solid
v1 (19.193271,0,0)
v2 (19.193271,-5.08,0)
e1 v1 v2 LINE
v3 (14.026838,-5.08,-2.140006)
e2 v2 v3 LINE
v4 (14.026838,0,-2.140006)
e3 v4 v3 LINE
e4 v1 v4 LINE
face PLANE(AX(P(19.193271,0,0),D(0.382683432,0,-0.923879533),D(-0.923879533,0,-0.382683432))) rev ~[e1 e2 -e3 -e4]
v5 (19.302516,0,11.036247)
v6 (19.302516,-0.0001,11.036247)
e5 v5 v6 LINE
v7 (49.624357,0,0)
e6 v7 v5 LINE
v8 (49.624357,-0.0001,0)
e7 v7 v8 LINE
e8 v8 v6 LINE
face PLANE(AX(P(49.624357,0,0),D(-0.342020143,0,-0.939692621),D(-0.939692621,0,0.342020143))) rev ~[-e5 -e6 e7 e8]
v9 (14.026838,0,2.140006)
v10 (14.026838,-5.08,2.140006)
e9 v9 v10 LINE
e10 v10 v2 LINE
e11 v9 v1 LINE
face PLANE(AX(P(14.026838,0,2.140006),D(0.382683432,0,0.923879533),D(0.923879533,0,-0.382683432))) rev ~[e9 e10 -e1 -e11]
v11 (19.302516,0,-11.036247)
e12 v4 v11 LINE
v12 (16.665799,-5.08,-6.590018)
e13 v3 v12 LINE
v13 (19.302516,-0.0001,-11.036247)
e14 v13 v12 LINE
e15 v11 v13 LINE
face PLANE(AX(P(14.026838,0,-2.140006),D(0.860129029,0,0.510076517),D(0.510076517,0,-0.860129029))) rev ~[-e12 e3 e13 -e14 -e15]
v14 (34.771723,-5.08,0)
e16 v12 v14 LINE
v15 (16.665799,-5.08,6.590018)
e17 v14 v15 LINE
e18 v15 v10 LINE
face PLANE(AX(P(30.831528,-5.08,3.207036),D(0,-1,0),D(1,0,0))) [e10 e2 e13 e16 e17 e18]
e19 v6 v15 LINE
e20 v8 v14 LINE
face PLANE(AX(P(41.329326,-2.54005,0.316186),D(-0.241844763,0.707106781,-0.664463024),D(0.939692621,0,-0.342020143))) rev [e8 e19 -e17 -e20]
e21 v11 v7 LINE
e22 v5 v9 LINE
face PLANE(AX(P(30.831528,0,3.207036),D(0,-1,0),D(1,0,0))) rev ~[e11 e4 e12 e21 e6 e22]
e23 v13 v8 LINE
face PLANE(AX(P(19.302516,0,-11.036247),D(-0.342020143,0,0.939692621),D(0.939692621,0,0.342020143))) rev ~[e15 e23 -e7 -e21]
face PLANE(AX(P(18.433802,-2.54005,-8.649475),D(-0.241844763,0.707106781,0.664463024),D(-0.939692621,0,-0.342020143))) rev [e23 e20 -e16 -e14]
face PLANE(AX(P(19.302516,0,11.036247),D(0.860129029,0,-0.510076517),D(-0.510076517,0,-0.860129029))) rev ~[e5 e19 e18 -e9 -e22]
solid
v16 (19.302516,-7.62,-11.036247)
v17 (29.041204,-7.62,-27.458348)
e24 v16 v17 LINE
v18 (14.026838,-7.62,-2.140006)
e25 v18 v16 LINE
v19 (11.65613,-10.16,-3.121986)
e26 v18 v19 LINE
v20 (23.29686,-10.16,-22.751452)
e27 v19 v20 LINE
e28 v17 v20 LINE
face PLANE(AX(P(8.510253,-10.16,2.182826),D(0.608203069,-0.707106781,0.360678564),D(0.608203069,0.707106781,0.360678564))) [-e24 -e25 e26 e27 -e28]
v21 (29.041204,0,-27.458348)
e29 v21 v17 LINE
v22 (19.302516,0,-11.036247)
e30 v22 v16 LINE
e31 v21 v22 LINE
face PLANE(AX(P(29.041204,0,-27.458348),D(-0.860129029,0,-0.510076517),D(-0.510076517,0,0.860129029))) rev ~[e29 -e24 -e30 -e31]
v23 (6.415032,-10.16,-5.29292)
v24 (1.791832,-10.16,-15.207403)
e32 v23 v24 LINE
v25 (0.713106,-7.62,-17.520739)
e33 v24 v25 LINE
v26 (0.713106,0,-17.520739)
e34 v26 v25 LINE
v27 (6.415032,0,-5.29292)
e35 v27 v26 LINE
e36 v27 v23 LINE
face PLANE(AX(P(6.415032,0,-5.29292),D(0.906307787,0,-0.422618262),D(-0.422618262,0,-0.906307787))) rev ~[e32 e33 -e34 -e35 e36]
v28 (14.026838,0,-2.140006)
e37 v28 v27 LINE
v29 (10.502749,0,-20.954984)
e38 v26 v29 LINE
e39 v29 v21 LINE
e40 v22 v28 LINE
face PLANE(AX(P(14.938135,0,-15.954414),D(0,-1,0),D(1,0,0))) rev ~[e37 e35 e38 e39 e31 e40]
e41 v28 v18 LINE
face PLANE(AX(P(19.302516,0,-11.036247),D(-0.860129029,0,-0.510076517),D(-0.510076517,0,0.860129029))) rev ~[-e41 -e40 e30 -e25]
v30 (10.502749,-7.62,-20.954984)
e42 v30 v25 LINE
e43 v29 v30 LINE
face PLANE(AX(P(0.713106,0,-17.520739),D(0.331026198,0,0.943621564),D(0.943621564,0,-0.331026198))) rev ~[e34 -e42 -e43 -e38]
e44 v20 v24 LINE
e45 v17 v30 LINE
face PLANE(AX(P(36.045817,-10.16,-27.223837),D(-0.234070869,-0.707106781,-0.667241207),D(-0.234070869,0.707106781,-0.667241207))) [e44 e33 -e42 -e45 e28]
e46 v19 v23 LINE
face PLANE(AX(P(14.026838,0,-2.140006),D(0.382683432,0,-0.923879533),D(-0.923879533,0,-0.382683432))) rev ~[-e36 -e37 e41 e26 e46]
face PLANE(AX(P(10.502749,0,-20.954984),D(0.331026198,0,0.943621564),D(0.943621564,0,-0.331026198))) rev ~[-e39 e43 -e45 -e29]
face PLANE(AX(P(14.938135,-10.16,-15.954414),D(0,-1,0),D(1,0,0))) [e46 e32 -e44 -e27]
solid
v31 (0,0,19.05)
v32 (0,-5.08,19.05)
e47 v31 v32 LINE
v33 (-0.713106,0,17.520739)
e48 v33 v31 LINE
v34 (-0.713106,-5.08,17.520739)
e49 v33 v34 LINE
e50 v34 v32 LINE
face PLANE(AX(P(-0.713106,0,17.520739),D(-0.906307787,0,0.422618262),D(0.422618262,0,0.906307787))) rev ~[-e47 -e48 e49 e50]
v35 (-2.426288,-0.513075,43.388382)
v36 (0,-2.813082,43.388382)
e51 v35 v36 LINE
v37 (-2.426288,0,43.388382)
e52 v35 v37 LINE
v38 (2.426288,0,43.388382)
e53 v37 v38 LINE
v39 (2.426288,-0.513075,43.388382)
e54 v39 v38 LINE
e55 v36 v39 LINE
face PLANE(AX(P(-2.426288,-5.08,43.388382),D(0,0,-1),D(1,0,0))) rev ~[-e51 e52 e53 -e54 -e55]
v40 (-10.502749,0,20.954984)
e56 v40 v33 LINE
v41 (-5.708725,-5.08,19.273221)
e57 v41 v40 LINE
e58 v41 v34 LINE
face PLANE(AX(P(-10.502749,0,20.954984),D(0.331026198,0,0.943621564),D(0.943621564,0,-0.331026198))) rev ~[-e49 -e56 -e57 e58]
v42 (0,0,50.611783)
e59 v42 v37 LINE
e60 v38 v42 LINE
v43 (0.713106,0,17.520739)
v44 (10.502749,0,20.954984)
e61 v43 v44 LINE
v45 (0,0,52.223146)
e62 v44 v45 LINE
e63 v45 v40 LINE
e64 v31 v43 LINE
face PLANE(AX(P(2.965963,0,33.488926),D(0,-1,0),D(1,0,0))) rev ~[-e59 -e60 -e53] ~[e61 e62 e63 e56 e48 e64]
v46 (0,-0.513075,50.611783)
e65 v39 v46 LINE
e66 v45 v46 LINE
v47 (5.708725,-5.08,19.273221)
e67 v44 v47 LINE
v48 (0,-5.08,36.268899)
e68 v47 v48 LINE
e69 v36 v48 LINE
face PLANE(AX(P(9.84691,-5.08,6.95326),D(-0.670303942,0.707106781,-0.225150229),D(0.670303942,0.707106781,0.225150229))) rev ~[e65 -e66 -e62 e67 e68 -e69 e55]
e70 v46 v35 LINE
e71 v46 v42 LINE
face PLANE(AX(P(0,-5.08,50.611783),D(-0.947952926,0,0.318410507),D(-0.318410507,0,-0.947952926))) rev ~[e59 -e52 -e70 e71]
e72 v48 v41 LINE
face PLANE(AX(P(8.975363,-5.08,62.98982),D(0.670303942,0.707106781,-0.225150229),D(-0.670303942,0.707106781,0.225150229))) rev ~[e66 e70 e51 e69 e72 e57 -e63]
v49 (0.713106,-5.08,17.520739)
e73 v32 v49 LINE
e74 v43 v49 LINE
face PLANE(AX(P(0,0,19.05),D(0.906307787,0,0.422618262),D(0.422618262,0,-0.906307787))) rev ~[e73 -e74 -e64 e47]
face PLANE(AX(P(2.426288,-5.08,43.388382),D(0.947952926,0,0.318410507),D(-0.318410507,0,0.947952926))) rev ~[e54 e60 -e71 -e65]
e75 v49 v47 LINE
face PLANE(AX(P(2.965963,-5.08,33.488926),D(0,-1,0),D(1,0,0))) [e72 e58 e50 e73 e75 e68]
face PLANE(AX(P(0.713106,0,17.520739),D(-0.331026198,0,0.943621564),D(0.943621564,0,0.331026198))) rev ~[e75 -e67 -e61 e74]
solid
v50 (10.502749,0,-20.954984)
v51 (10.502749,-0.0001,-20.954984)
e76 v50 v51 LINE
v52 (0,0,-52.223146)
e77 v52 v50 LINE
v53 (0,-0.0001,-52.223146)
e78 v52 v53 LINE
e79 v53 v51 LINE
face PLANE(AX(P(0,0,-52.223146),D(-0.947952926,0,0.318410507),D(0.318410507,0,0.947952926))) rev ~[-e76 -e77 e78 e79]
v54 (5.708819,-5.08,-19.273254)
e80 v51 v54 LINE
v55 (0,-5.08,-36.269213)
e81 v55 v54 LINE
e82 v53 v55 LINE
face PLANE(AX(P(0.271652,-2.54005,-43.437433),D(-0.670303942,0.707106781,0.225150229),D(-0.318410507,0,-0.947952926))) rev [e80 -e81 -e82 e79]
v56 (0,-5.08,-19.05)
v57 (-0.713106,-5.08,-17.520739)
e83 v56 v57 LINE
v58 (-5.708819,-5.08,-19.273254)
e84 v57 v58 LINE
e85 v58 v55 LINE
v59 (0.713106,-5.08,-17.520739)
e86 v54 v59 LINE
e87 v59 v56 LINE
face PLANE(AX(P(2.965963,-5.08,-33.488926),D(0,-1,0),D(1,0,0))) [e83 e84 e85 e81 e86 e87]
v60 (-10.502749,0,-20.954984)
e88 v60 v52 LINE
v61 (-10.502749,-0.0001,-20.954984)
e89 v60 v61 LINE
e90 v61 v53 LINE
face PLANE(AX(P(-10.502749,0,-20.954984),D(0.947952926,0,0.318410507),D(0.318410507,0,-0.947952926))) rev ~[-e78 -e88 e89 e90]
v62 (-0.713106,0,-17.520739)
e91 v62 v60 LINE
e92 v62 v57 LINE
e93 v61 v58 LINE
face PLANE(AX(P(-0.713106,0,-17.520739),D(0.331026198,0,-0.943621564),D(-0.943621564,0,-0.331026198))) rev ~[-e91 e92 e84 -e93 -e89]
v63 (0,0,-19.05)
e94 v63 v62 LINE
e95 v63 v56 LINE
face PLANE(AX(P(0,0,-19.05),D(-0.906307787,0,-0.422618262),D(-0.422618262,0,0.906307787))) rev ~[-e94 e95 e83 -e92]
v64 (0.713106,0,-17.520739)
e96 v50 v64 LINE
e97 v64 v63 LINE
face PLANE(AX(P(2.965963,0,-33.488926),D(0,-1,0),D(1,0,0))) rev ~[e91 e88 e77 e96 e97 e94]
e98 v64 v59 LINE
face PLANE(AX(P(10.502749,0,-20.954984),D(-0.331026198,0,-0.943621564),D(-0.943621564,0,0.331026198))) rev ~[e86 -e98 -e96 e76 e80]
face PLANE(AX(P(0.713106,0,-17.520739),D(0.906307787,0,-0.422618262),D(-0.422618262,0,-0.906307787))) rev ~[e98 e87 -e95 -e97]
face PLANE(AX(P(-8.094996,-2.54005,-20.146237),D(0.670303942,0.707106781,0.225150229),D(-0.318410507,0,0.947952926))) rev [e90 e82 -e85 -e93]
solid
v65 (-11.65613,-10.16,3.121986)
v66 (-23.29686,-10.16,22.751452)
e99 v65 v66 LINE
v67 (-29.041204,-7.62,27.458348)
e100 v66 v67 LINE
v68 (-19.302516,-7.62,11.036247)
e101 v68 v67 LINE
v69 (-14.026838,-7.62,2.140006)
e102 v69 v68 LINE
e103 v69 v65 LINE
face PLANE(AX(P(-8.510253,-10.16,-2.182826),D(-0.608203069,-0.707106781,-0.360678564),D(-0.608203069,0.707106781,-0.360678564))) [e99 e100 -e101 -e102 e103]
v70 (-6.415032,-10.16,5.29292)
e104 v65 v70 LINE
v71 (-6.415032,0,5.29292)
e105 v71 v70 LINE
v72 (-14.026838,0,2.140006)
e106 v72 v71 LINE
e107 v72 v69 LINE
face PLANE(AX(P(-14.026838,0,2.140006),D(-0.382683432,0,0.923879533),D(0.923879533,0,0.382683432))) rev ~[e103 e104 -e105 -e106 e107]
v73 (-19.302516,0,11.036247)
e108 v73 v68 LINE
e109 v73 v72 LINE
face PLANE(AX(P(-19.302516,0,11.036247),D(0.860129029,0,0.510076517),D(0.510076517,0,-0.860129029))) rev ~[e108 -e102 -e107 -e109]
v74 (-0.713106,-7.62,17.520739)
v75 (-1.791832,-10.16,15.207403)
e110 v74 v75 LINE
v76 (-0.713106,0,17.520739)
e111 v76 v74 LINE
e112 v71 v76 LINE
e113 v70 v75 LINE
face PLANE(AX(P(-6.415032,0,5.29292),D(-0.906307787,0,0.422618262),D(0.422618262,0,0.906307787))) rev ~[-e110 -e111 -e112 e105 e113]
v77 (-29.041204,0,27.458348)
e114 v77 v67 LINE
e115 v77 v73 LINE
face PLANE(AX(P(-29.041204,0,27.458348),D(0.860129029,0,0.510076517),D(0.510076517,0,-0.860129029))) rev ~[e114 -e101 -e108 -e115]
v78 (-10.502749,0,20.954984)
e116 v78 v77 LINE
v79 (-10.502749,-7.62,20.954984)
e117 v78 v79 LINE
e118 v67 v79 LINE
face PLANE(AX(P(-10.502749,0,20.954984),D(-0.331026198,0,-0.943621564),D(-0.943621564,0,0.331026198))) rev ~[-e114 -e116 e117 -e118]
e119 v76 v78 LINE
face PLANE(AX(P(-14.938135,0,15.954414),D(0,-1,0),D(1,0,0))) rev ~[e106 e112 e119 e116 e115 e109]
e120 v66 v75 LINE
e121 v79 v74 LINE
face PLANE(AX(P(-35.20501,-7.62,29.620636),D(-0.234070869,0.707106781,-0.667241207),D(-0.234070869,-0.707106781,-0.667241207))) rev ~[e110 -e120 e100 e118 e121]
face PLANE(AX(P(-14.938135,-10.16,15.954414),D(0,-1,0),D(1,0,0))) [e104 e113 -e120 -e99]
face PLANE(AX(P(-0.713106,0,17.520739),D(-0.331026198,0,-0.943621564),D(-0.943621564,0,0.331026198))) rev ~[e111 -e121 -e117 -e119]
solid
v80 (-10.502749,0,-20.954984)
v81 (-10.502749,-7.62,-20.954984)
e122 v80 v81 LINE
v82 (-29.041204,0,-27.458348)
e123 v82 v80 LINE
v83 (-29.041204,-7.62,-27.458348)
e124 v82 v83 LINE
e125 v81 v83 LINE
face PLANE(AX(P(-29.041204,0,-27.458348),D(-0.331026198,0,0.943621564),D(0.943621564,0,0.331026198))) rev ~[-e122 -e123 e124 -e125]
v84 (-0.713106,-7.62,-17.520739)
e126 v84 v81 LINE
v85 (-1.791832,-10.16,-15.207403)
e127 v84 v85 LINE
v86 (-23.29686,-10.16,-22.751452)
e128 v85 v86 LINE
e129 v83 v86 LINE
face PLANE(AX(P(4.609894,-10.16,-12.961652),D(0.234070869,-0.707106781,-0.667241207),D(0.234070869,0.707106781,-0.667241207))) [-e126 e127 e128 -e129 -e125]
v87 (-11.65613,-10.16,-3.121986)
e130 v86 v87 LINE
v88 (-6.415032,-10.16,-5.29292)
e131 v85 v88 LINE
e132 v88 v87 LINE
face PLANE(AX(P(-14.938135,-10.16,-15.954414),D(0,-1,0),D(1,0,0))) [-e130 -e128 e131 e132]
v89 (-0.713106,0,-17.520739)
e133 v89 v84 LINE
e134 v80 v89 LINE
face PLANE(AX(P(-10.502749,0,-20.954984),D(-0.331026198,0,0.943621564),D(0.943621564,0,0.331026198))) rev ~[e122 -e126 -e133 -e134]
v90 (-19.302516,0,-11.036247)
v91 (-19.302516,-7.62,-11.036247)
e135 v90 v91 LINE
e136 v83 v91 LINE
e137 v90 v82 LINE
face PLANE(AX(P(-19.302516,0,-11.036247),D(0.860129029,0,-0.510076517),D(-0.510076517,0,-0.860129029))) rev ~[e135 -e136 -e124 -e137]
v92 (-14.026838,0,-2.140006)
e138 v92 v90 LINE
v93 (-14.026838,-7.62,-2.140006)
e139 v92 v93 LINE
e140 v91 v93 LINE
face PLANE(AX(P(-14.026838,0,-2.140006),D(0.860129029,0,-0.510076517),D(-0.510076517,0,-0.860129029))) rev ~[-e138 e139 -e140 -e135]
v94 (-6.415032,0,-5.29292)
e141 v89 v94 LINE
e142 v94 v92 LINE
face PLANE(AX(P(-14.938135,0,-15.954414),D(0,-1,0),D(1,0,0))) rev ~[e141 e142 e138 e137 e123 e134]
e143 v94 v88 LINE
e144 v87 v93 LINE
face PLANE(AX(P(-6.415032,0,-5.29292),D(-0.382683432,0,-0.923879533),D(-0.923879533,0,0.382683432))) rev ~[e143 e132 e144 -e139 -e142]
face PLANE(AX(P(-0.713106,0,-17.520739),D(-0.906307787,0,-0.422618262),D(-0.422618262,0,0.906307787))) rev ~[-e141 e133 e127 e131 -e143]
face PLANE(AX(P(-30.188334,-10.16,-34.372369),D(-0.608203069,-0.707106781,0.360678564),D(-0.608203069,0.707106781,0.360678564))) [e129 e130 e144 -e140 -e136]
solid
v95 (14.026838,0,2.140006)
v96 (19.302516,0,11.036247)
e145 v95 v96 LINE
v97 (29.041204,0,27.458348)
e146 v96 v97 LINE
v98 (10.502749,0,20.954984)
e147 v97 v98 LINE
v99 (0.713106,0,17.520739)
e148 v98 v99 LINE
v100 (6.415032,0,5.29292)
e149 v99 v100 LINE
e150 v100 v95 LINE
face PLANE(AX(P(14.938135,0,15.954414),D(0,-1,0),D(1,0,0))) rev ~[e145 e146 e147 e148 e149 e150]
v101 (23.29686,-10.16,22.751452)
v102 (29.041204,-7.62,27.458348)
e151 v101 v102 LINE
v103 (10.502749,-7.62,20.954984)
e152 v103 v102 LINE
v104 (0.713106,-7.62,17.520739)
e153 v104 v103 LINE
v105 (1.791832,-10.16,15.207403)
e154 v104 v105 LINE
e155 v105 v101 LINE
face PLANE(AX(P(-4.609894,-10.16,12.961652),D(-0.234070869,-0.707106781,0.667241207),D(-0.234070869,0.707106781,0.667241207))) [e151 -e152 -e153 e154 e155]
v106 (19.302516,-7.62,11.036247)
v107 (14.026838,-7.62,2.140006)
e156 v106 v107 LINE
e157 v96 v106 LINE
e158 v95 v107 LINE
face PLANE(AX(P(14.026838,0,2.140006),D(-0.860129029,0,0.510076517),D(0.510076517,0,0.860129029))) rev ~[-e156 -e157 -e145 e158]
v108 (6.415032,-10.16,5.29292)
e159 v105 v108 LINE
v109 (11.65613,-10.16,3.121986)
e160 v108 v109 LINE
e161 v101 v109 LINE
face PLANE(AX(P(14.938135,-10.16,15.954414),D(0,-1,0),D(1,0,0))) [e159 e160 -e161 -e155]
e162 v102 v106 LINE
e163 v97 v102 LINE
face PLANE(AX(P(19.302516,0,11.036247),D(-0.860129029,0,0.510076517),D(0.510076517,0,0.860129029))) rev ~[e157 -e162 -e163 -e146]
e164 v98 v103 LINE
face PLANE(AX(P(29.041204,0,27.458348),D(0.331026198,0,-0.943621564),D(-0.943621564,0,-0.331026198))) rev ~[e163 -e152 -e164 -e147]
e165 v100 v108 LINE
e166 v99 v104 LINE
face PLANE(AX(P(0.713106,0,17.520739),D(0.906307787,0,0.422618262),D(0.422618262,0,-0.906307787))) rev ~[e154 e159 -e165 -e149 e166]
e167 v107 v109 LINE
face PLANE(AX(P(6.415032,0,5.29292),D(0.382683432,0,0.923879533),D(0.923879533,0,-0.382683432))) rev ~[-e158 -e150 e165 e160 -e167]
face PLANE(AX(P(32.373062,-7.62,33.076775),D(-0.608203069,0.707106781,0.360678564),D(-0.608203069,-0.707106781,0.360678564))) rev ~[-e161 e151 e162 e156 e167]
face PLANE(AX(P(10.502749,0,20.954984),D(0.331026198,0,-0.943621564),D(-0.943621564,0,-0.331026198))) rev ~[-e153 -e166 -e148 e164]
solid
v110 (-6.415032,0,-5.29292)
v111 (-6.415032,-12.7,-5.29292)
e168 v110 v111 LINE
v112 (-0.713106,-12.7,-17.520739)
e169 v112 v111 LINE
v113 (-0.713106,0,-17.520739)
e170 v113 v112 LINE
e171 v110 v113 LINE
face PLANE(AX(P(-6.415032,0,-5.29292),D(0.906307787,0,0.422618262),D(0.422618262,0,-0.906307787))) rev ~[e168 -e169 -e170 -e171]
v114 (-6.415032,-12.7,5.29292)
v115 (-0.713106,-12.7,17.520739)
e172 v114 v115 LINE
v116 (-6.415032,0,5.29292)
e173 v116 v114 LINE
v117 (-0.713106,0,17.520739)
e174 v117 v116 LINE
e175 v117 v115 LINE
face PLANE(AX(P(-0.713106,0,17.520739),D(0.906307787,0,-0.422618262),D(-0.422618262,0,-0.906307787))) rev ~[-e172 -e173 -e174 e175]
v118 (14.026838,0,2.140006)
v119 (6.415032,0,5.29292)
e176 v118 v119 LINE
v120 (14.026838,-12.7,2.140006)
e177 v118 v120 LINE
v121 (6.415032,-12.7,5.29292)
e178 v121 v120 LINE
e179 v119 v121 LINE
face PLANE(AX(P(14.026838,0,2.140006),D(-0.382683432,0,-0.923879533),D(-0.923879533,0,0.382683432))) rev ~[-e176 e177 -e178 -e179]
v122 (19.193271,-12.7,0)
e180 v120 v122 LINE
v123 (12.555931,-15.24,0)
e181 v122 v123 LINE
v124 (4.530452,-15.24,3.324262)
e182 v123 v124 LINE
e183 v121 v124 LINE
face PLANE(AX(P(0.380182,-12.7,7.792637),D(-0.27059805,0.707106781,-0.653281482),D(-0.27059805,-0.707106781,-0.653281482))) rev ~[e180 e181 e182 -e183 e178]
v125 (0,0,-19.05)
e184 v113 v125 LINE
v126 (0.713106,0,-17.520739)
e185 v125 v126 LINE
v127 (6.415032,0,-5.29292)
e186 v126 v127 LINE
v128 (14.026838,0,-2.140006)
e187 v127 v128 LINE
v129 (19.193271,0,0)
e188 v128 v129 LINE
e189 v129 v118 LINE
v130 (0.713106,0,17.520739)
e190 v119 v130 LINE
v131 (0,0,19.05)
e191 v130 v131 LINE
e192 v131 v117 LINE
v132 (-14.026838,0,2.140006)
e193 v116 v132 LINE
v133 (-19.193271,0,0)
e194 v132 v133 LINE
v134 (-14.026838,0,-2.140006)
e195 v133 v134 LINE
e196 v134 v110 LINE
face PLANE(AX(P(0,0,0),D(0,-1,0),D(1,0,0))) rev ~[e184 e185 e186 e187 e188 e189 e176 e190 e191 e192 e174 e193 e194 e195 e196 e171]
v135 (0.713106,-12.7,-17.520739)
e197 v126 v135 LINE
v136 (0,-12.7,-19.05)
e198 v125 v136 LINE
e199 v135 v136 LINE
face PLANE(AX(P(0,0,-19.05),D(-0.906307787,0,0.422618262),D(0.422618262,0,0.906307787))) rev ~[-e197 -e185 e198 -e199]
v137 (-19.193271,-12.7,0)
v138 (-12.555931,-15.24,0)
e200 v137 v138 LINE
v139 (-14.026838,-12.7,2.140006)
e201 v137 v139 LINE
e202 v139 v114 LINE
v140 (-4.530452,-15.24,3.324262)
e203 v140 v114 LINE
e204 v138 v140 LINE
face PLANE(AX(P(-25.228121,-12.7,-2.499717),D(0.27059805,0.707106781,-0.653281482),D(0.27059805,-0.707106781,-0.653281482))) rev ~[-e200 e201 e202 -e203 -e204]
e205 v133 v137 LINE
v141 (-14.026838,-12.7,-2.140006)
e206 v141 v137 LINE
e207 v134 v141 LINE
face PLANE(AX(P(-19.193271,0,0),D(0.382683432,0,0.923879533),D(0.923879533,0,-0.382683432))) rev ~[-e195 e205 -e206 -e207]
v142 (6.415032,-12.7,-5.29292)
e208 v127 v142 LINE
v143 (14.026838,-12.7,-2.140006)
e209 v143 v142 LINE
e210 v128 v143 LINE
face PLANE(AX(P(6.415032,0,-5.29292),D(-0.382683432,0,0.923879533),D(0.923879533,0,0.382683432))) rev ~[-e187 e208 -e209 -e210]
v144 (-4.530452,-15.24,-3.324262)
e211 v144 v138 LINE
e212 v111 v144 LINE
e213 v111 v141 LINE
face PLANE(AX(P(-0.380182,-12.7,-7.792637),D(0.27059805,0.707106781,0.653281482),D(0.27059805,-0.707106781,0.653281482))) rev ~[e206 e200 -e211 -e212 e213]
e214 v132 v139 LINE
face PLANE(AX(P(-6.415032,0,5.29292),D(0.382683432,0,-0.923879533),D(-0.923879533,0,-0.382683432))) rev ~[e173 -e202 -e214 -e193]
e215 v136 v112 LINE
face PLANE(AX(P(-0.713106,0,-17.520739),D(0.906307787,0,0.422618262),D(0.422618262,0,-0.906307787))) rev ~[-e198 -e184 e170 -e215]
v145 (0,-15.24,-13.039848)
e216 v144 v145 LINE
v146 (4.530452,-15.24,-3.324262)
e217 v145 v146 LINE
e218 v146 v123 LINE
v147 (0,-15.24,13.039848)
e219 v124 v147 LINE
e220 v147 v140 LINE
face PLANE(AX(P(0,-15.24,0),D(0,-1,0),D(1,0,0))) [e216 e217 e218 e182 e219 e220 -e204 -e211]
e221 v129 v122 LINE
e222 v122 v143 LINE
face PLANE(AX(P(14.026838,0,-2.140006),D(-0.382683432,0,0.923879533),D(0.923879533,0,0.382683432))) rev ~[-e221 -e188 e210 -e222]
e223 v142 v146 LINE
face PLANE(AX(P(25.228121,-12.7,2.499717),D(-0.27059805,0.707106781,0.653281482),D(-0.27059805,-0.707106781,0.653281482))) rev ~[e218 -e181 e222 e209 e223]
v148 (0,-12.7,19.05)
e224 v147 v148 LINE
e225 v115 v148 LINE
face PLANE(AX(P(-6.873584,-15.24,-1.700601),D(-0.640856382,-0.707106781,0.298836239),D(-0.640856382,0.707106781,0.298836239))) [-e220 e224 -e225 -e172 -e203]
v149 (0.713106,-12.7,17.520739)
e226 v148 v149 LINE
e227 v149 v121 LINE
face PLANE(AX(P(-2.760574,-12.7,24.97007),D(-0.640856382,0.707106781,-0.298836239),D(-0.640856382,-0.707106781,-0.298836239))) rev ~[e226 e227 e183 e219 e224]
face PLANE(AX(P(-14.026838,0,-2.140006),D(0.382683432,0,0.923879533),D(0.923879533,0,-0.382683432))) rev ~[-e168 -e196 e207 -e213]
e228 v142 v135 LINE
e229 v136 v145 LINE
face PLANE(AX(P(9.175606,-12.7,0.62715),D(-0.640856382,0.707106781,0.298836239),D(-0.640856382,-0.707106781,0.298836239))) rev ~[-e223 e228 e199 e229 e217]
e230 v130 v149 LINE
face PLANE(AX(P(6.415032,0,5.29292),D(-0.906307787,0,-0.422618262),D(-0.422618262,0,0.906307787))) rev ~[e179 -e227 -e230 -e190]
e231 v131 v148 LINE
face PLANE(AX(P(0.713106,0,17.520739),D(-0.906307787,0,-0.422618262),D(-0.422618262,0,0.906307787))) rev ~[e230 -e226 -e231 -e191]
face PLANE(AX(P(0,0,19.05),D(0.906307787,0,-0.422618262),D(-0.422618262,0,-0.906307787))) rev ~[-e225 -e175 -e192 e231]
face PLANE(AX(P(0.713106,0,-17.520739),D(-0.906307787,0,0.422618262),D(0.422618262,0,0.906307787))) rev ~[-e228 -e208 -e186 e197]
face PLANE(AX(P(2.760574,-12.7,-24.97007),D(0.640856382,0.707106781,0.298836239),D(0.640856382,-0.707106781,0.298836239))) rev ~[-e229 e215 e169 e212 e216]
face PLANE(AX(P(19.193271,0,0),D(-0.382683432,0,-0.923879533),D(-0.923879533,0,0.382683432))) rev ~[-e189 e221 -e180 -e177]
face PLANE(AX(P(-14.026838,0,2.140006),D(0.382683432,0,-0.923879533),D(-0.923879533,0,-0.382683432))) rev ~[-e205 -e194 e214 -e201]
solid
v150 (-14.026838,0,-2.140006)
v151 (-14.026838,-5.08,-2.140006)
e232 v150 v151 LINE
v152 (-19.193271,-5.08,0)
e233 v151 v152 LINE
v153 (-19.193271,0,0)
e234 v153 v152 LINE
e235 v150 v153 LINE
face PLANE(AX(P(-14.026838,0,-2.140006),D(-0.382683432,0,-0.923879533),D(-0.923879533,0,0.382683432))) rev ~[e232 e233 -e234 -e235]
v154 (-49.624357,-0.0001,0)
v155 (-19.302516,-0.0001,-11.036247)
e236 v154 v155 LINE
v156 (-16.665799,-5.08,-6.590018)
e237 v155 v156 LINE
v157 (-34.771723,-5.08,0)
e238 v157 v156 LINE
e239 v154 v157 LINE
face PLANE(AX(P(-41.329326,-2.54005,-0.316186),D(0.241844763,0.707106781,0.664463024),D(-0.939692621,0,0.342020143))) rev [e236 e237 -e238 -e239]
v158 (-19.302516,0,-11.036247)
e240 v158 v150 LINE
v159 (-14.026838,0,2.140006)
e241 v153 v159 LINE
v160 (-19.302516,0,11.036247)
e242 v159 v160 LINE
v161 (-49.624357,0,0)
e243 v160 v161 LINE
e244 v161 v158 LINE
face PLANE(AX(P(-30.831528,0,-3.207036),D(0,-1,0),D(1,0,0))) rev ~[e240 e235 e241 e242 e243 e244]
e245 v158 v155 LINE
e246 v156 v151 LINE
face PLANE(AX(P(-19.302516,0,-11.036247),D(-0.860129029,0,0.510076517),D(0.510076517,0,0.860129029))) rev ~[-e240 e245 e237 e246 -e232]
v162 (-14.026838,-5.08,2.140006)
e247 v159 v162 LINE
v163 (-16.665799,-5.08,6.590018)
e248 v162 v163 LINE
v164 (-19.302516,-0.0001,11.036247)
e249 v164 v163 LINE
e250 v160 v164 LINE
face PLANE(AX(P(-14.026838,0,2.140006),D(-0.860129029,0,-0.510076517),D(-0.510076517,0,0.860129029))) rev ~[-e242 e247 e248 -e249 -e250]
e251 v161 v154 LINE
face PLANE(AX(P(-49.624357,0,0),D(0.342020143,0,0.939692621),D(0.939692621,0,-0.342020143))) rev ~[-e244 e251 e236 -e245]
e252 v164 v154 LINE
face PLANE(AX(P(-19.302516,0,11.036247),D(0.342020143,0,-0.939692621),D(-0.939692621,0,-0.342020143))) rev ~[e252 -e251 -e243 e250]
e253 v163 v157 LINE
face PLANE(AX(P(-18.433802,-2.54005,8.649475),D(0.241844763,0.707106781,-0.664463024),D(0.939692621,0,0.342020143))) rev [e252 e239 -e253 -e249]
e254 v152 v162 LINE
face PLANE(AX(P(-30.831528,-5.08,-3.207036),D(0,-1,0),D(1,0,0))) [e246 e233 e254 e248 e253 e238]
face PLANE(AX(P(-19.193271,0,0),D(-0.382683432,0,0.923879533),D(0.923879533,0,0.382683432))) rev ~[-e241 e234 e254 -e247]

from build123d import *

# Parameters (mm, degrees)
F1_DEPTH       = 5.08
F2_DEPTH       = 10.16
F3_DEPTH       = 15.24
F5_DEPTH       = 25.4
F6_T1_DEPTH    = 43.0847621983
F6_T3_DEPTH    = 42.4996652057
F6_2_T1_DEPTH  = 42.4996652057
F6_2_T3_DEPTH  = 43.0847621983
F6_3_T1_DEPTH  = 43.0847621983
F6_3_T3_DEPTH  = 42.4996652057
F6_4_T1_DEPTH  = 42.4996652057
F6_4_T3_DEPTH  = 43.0847621983
F6_5_T4_DEPTH  = 28.2434080268
F6_5_T9_DEPTH  = 28.2434080268
F6_5_T14_DEPTH = 26.8952157279
F6_5_T19_DEPTH = 26.8952157279
F6_5_T24_DEPTH = 28.2434080268
F6_5_T29_DEPTH = 28.2434080268
F6_5_T34_DEPTH = 26.8952157279
F6_5_T39_DEPTH = 26.8952157279
F6_5_T45_DEPTH = 28.2434080268
F6_5_T49_DEPTH = 26.8952157279
F6_5_T56_DEPTH = 26.8952157279
F6_5_T60_DEPTH = 28.2434080268
F6_5_T67_DEPTH = 28.2434080268
F6_5_T71_DEPTH = 26.8952157279
F6_5_T78_DEPTH = 26.8952157279
F6_5_T82_DEPTH = 28.2434080268
F7_C1_SIZE     = 5.0799
F7_C2_SIZE     = 5.0799
F7_2_T1_DEPTH  = 59.1132304118
F7_2_T3_DEPTH  = 59.1132304118
F7_3_C1_SIZE   = 5.0799
F7_3_C2_SIZE   = 5.0799
F7_4_C1_SIZE   = 5.0799
F7_4_C2_SIZE   = 5.0799


# Not quite as in the source:
# - a fillet or chamfer that OpenCascade refuses, or shapes differently, is made with other operations: its cross-section is extruded or revolved along the edge and cut away or added
# - a fillet or chamfer is up to 0.001 mm smaller than in the source, because OpenCascade refuses the exact size


with BuildPart() as f1:
    # F0 (on Front) → F1 (new body)
    with BuildSketch(Plane.XZ):
        Polygon((-19.1932707477, 0), (-49.6243569425, 0), (-19.302516341, -11.0362474271), (-14.0268384734, -2.1400063171), align=None)
        Polygon((-19.302516341, 11.0362474271), (-49.6243569425, 0), (-19.1932707477, 0), (-14.0268384734, 2.1400063171), align=None)
    extrude(amount=F1_DEPTH)

    # F7: chamfer of 5.08 on 2 edges, made by hand

    # F7_c1 (size 5.08 in the source; OpenCascade refuses exactly that, so slightly less here)
    f7_c1_edges = [f1.edges().sort_by_distance(p)[0] for p in [
        (-34.4634366418, -5.08, 5.5181237136),
    ]]
    chamfer(f7_c1_edges, length=F7_C1_SIZE)

    # F7_c2 (size 5.08 in the source; OpenCascade refuses exactly that, so slightly less here)
    f7_c2_edges = [f1.edges().sort_by_distance(p)[0] for p in [
        (-30.7502781487, -5.08, -6.8696028802),
    ]]
    chamfer(f7_c2_edges, length=F7_C2_SIZE)


with BuildPart() as f1b:
    # F0 (on Front) → F1, piece 2 (new body)
    with BuildSketch(Plane.XZ):
        Polygon((10.5027486839, 20.9549840158), (0, 52.2231460967), (0, 19.05), (0.7131063295, 17.5207385413), align=None)
        Polygon((0, 52.2231460967), (-10.5027486839, 20.9549840158), (-0.7131063295, 17.5207385413), (0, 19.05), align=None)
    extrude(amount=F1_DEPTH)

    # F4 (on face) → F5 (cut)
    with BuildSketch(Plane.XZ.offset(5.08)):
        Polygon((2.4262880633, 43.3883815264), (0, 50.611782819), (-2.4262880633, 43.3883815264), align=None)
    extrude(amount=-F5_DEPTH, mode=Mode.SUBTRACT)

    # F7#2: chamfer of 5.08 on 2 edges, made by hand

    # F7_2_s2 → F7_2_t1 (cut)
    with BuildSketch(Plane(origin=(-1.1004277598, 0, 3.2761284296), x_dir=(0, 1, 0), z_dir=(-0.318410507, 0, 0.9479529255))):
        Polygon((-5.08, -11.5483984258), (0, -16.6283984258), (-5.08, -16.6283984258), align=None)
    extrude(amount=F7_2_T1_DEPTH, mode=Mode.SUBTRACT)

    # F7_2_s4 → F7_2_t3 (cut)
    with BuildSketch(Plane(origin=(19.9227014256, 0, 59.3126881363), x_dir=(0, 1, 0), z_dir=(-0.318410507, 0, -0.9479529255))):
        Polygon((-5.08, -11.5483984258), (0, -16.6283984258), (-5.08, -16.6283984258), align=None)
    extrude(amount=F7_2_T3_DEPTH, mode=Mode.SUBTRACT)


with BuildPart() as f1c:
    # F0 (on Front) → F1, piece 3 (new body)
    with BuildSketch(Plane.XZ):
        Polygon((49.6243569425, 0), (19.302516341, 11.0362474271), (14.0268384734, 2.1400063171), (19.1932707477, 0), align=None)
        Polygon((14.0268384734, -2.1400063171), (19.302516341, -11.0362474271), (49.6243569425, 0), (19.1932707477, 0), align=None)
    extrude(amount=F1_DEPTH)

    # F7#3: chamfer of 5.08 on 2 edges, made by hand

    # F7_3_c1 (size 5.08 in the source; OpenCascade refuses exactly that, so slightly less here)
    f7_3_c1_edges = [f1c.edges().sort_by_distance(p)[0] for p in [
        (34.4634366418, -5.08, -5.5181237136),
    ]]
    chamfer(f7_3_c1_edges, length=F7_3_C1_SIZE)

    # F7_3_c2 (size 5.08 in the source; OpenCascade refuses exactly that, so slightly less here)
    f7_3_c2_edges = [f1c.edges().sort_by_distance(p)[0] for p in [
        (30.7502781487, -5.08, 6.8696028802),
    ]]
    chamfer(f7_3_c2_edges, length=F7_3_C2_SIZE)


with BuildPart() as f1d:
    # F0 (on Front) → F1, piece 4 (new body)
    with BuildSketch(Plane.XZ):
        Polygon((0, -19.05), (0, -52.2231460967), (10.5027486839, -20.9549840158), (0.7131063295, -17.5207385413), align=None)
        Polygon((-0.7131063295, -17.5207385413), (-10.5027486839, -20.9549840158), (0, -52.2231460967), (0, -19.05), align=None)
    extrude(amount=F1_DEPTH)

    # F7#4: chamfer of 5.08 on 2 edges, made by hand

    # F7_4_c1 (size 5.08 in the source; OpenCascade refuses exactly that, so slightly less here)
    f7_4_c1_edges = [f1d.edges().sort_by_distance(p)[0] for p in [
        (-5.251374342, -5.08, -36.5890650563),
    ]]
    chamfer(f7_4_c1_edges, length=F7_4_C1_SIZE)

    # F7_4_c2 (size 5.08 in the source; OpenCascade refuses exactly that, so slightly less here)
    f7_4_c2_edges = [f1d.edges().sort_by_distance(p)[0] for p in [
        (6.591076943, -5.08, -32.6005817239),
    ]]
    chamfer(f7_4_c2_edges, length=F7_4_C2_SIZE)


with BuildPart() as f2:
    # F0 (on Front) → F2 (new body)
    with BuildSketch(Plane.XZ):
        Polygon((-29.0412037669, 27.4583477923), (-19.302516341, 11.0362474271), (-14.0268384734, 2.1400063171), (-6.4150318198, 5.2929198672), (-0.7131063295, 17.5207385413), (-10.5027486839, 20.9549840158), align=None)
    extrude(amount=F2_DEPTH)

    # F6: chamfer of 2.54 on 2 edges, made by hand

    # F6_s2 → F6_t1 (cut)
    with BuildSketch(Plane(origin=(-40.5997078736, 0, 14.2425390001), x_dir=(0, 1, 0), z_dir=(0.9436215642, 0, -0.3310261978))):
        Polygon((-7.62, 16.296889831), (-10.16, 13.756889831), (-10.16, 16.296889831), align=None)
    extrude(amount=F6_T1_DEPTH, mode=Mode.SUBTRACT)

    # F6_s4 → F6_t3 (cut)
    with BuildSketch(Plane(origin=(-1.256506008, 0, 2.1188140527), x_dir=(0, 1, 0), z_dir=(-0.5100765172, 0, 0.860129029))):
        Polygon((-10.16, 8.4333239875), (-7.62, 10.9733239875), (-10.16, 10.9733239875), align=None)
    extrude(amount=F6_T3_DEPTH, mode=Mode.SUBTRACT)


with BuildPart() as f2b:
    # F0 (on Front) → F2, piece 2 (new body)
    with BuildSketch(Plane.XZ):
        Polygon((-14.0268384734, -2.1400063171), (-19.302516341, -11.0362474271), (-29.0412037669, -27.4583477923), (-10.5027486839, -20.9549840158), (-0.7131063295, -17.5207385413), (-6.4150318198, -5.2929198672), align=None)
    extrude(amount=F2_DEPTH)

    # F6#2: chamfer of 2.54 on 2 edges, made by hand

    # F6_2_s2 → F6_2_t1 (cut)
    with BuildSketch(Plane(origin=(-22.934587219, 0, -38.6740098203), x_dir=(0, 1, 0), z_dir=(0.5100765172, 0, 0.860129029))):
        Polygon((-10.16, 8.4333239875), (-7.62, 10.9733239875), (-10.16, 10.9733239875), align=None)
    extrude(amount=F6_2_T1_DEPTH, mode=Mode.SUBTRACT)

    # F6_2_s4 → F6_2_t3 (cut)
    with BuildSketch(Plane(origin=(0.056002824, 0, 0.0196460134), x_dir=(0, 1, 0), z_dir=(-0.9436215642, 0, -0.3310261978))):
        Polygon((-10.16, 13.756889831), (-7.62, 16.296889831), (-10.16, 16.296889831), align=None)
    extrude(amount=F6_2_T3_DEPTH, mode=Mode.SUBTRACT)


with BuildPart() as f2c:
    # F0 (on Front) → F2, piece 3 (new body)
    with BuildSketch(Plane.XZ):
        Polygon((0.7131063295, -17.5207385413), (10.5027486839, -20.9549840158), (29.0412037669, -27.4583477923), (19.302516341, -11.0362474271), (14.0268384734, -2.1400063171), (6.4150318198, -5.2929198672), align=None)
    extrude(amount=F2_DEPTH)

    # F6#3: chamfer of 2.54 on 2 edges, made by hand

    # F6_3_s2 → F6_3_t1 (cut)
    with BuildSketch(Plane(origin=(40.5997078736, 0, -14.2425390001), x_dir=(0, 1, 0), z_dir=(-0.9436215642, 0, 0.3310261978))):
        Polygon((-10.16, 13.756889831), (-7.62, 16.296889831), (-10.16, 16.296889831), align=None)
    extrude(amount=F6_3_T1_DEPTH, mode=Mode.SUBTRACT)

    # F6_3_s4 → F6_3_t3 (cut)
    with BuildSketch(Plane(origin=(1.256506008, 0, -2.1188140527), x_dir=(0, 1, 0), z_dir=(0.5100765172, 0, -0.860129029))):
        Polygon((-10.16, 8.4333239875), (-7.62, 10.9733239875), (-10.16, 10.9733239875), align=None)
    extrude(amount=F6_3_T3_DEPTH, mode=Mode.SUBTRACT)


with BuildPart() as f2d:
    # F0 (on Front) → F2, piece 4 (new body)
    with BuildSketch(Plane.XZ):
        Polygon((29.0412037669, 27.4583477923), (10.5027486839, 20.9549840158), (0.7131063295, 17.5207385413), (6.4150318198, 5.2929198672), (14.0268384734, 2.1400063171), (19.302516341, 11.0362474271), align=None)
    extrude(amount=F2_DEPTH)

    # F6#4: chamfer of 2.54 on 2 edges, made by hand

    # F6_4_s2 → F6_4_t1 (cut)
    with BuildSketch(Plane(origin=(22.934587219, 0, 38.6740098203), x_dir=(0, 1, 0), z_dir=(-0.5100765172, 0, -0.860129029))):
        Polygon((-7.62, 10.9733239875), (-10.16, 8.4333239875), (-10.16, 10.9733239875), align=None)
    extrude(amount=F6_4_T1_DEPTH, mode=Mode.SUBTRACT)

    # F6_4_s4 → F6_4_t3 (cut)
    with BuildSketch(Plane(origin=(-0.056002824, 0, -0.0196460134), x_dir=(0, 1, 0), z_dir=(0.9436215642, 0, 0.3310261978))):
        Polygon((-10.16, 13.756889831), (-7.62, 16.296889831), (-10.16, 16.296889831), align=None)
    extrude(amount=F6_4_T3_DEPTH, mode=Mode.SUBTRACT)


with BuildPart() as f3:
    # F0 (on Front) → F3 (new body)
    with BuildSketch(Plane.XZ):
        Polygon((-14.0268384734, 2.1400063171), (-19.1932707477, 0), (-14.0268384734, -2.1400063171), (-6.4150318198, -5.2929198672), (-0.7131063295, -17.5207385413), (0, -19.05), (0.7131063295, -17.5207385413), (6.4150318198, -5.2929198672), (14.0268384734, -2.1400063171), (19.1932707477, 0), (14.0268384734, 2.1400063171), (6.4150318198, 5.2929198672), (0.7131063295, 17.5207385413), (0, 19.05), (-0.7131063295, 17.5207385413), (-6.4150318198, 5.2929198672), align=None)
    extrude(amount=F3_DEPTH)

    # F6#5: chamfer of 2.54 on 8 edges, made by hand


with BuildPart() as f6_5_tool2:
    # F6_5_s3 → F6_5_t4 (new body)
    with BuildSketch(Plane(origin=(10.0571474138, 0, -21.5676222294), x_dir=(0, 1, 0), z_dir=(-0.4226182617, 0, 0.906307787))):
        Polygon((-12.7, 8.0508778862), (-15.24, 5.5108778862), (-15.24, 8.0508778862), align=None)
    extrude(amount=F6_5_T4_DEPTH)

    split(bisect_by=Plane(origin=(-2.8107894244, 0, -6.7858459494), x_dir=(0, 1, 0), z_dir=(-0.3826834324, 0, -0.9238795325)), keep=Keep.TOP)


with BuildPart() as f3_1:
    add(f3.part)

    # F6_5_t1: cut F6_5_tool2
    add(f6_5_tool2.part, mode=Mode.SUBTRACT)


with BuildPart() as f6_5_tool7:
    # F6_5_s8 → F6_5_t9 (new body)
    with BuildSketch(Plane(origin=(1.8790325922, 0, 4.0295983977), x_dir=(0, 1, 0), z_dir=(-0.4226182617, 0, -0.906307787))):
        Polygon((-12.7, 8.0508778862), (-15.24, 5.5108778862), (-15.24, 8.0508778862), align=None)
    extrude(amount=F6_5_T9_DEPTH)

    split(bisect_by=Plane(origin=(2.8107894244, 0, -6.7858459494), x_dir=(0, 1, 0), z_dir=(0.3826834324, 0, -0.9238795325)), keep=Keep.TOP)


with BuildPart() as f3_2:
    add(f3_1.part)

    # F6_5_t6: cut F6_5_tool7
    add(f6_5_tool7.part, mode=Mode.SUBTRACT)


with BuildPart() as f6_5_tool12:
    # F6_5_s13 → F6_5_t14 (new body)
    with BuildSketch(Plane(origin=(22.417331526, 0, 9.2855627503), x_dir=(0, 1, 0), z_dir=(-0.9238795325, 0, -0.3826834324))):
        Polygon((-12.7, 7.344946728), (-15.24, 4.804946728), (-15.24, 7.344946728), align=None)
    extrude(amount=F6_5_T14_DEPTH)

    split(bisect_by=Plane(origin=(7.2965733207, 0, -3.4024480177), x_dir=(0, 1, 0), z_dir=(0.906307787, 0, -0.4226182617)), keep=Keep.TOP)


with BuildPart() as f3_3:
    add(f3_2.part)

    # F6_5_t11: cut F6_5_tool12
    add(f6_5_tool12.part, mode=Mode.SUBTRACT)


with BuildPart() as f6_5_tool17:
    # F6_5_s18 → F6_5_t19 (new body)
    with BuildSketch(Plane(origin=(-2.4306078074, 0, 1.0067907186), x_dir=(0, 1, 0), z_dir=(0.9238795325, 0, -0.3826834324))):
        Polygon((-12.7, 7.344946728), (-15.24, 4.804946728), (-15.24, 7.344946728), align=None)
    extrude(amount=F6_5_T19_DEPTH)

    split(bisect_by=Plane(origin=(7.2965733207, 0, 3.4024480177), x_dir=(0, 1, 0), z_dir=(0.906307787, 0, 0.4226182617)), keep=Keep.TOP)


with BuildPart() as f3_4:
    add(f3_3.part)

    # F6_5_t16: cut F6_5_tool17
    add(f6_5_tool17.part, mode=Mode.SUBTRACT)


with BuildPart() as f6_5_tool22:
    # F6_5_s23 → F6_5_t24 (new body)
    with BuildSketch(Plane(origin=(-10.0571474138, 0, 21.5676222294), x_dir=(0, 1, 0), z_dir=(0.4226182617, 0, -0.906307787))):
        Polygon((-12.7, 8.0508778862), (-15.24, 5.5108778862), (-15.24, 8.0508778862), align=None)
    extrude(amount=F6_5_T24_DEPTH)

    split(bisect_by=Plane(origin=(2.8107894244, 0, 6.7858459494), x_dir=(0, 1, 0), z_dir=(0.3826834324, 0, 0.9238795325)), keep=Keep.TOP)


with BuildPart() as f3_5:
    add(f3_4.part)

    # F6_5_t21: cut F6_5_tool22
    add(f6_5_tool22.part, mode=Mode.SUBTRACT)


with BuildPart() as f6_5_tool27:
    # F6_5_s28 → F6_5_t29 (new body)
    with BuildSketch(Plane(origin=(-1.8790325922, 0, -4.0295983977), x_dir=(0, 1, 0), z_dir=(0.4226182617, 0, 0.906307787))):
        Polygon((-15.24, 5.5108778862), (-12.7, 8.0508778862), (-15.24, 8.0508778862), align=None)
    extrude(amount=F6_5_T29_DEPTH)

    split(bisect_by=Plane(origin=(-2.8107894244, 0, 6.7858459494), x_dir=(0, 1, 0), z_dir=(-0.3826834324, 0, 0.9238795325)), keep=Keep.TOP)


with BuildPart() as f3_6:
    add(f3_5.part)

    # F6_5_t26: cut F6_5_tool27
    add(f6_5_tool27.part, mode=Mode.SUBTRACT)


with BuildPart() as f6_5_tool32:
    # F6_5_s33 → F6_5_t34 (new body)
    with BuildSketch(Plane(origin=(-22.417331526, 0, -9.2855627503), x_dir=(0, 1, 0), z_dir=(0.9238795325, 0, 0.3826834324))):
        Polygon((-12.7, 7.344946728), (-15.24, 4.804946728), (-15.24, 7.344946728), align=None)
    extrude(amount=F6_5_T34_DEPTH)

    split(bisect_by=Plane(origin=(-7.2965733207, 0, 3.4024480177), x_dir=(0, 1, 0), z_dir=(-0.906307787, 0, 0.4226182617)), keep=Keep.TOP)


with BuildPart() as f3_7:
    add(f3_6.part)

    # F6_5_t31: cut F6_5_tool32
    add(f6_5_tool32.part, mode=Mode.SUBTRACT)


with BuildPart() as f6_5_tool37:
    # F6_5_s38 → F6_5_t39 (new body)
    with BuildSketch(Plane(origin=(2.4306078074, 0, -1.0067907186), x_dir=(0, 1, 0), z_dir=(-0.9238795325, 0, 0.3826834324))):
        Polygon((-12.7, 7.344946728), (-15.24, 4.804946728), (-15.24, 7.344946728), align=None)
    extrude(amount=F6_5_T39_DEPTH)

    split(bisect_by=Plane(origin=(-7.2965733207, 0, -3.4024480177), x_dir=(0, 1, 0), z_dir=(-0.906307787, 0, -0.4226182617)), keep=Keep.TOP)


with BuildPart() as f3_8:
    add(f3_7.part)

    # F6_5_t36: cut F6_5_tool37
    add(f6_5_tool37.part, mode=Mode.SUBTRACT)


with BuildPart() as f6_5_tool43:
    # F6_5_s44 → F6_5_t45 (new body)
    with BuildSketch(Plane(origin=(10.0571474138, 0, -21.5676222294), x_dir=(0, 1, 0), z_dir=(-0.4226182617, 0, 0.906307787))):
        Polygon((-12.7, 8.0508778862), (-15.24, 5.5108778862), (-15.24, 8.0508778862), align=None)
    extrude(amount=F6_5_T45_DEPTH)

    split(bisect_by=Plane(origin=(-2.8107894244, 0, -6.7858459494), x_dir=(0, 1, 0), z_dir=(0.3826834324, 0, 0.9238795325)), keep=Keep.TOP)


with BuildPart() as f6_5_tool47:
    # F6_5_s48 → F6_5_t49 (new body)
    with BuildSketch(Plane(origin=(2.4306078074, 0, -1.0067907186), x_dir=(0, 1, 0), z_dir=(-0.9238795325, 0, 0.3826834324))):
        Polygon((-12.7, 7.344946728), (-15.24, 4.804946728), (-15.24, 7.344946728), align=None)
    extrude(amount=F6_5_T49_DEPTH)

    split(bisect_by=Plane(origin=(-7.2965733207, 0, -3.4024480177), x_dir=(0, 1, 0), z_dir=(0.906307787, 0, 0.4226182617)), keep=Keep.TOP)


with BuildPart() as f6_5_tool43_1:
    add(f6_5_tool43.part)

    # F6_5_t51: intersect F6_5_tool47
    add(f6_5_tool47.part, mode=Mode.INTERSECT)


with BuildPart() as f3_9:
    add(f3_8.part)

    # F6_5_t41: cut F6_5_tool43
    add(f6_5_tool43_1.part, mode=Mode.SUBTRACT)


with BuildPart() as f6_5_tool54:
    # F6_5_s55 → F6_5_t56 (new body)
    with BuildSketch(Plane(origin=(22.417331526, 0, 9.2855627503), x_dir=(0, 1, 0), z_dir=(-0.9238795325, 0, -0.3826834324))):
        Polygon((-12.7, 7.344946728), (-15.24, 4.804946728), (-15.24, 7.344946728), align=None)
    extrude(amount=F6_5_T56_DEPTH)

    split(bisect_by=Plane(origin=(7.2965733207, 0, -3.4024480177), x_dir=(0, 1, 0), z_dir=(-0.906307787, 0, 0.4226182617)), keep=Keep.TOP)


with BuildPart() as f6_5_tool58:
    # F6_5_s59 → F6_5_t60 (new body)
    with BuildSketch(Plane(origin=(1.8790325922, 0, 4.0295983977), x_dir=(0, 1, 0), z_dir=(-0.4226182617, 0, -0.906307787))):
        Polygon((-12.7, 8.0508778862), (-15.24, 5.5108778862), (-15.24, 8.0508778862), align=None)
    extrude(amount=F6_5_T60_DEPTH)

    split(bisect_by=Plane(origin=(2.8107894244, 0, -6.7858459494), x_dir=(0, 1, 0), z_dir=(-0.3826834324, 0, 0.9238795325)), keep=Keep.TOP)


with BuildPart() as f6_5_tool54_1:
    add(f6_5_tool54.part)

    # F6_5_t62: intersect F6_5_tool58
    add(f6_5_tool58.part, mode=Mode.INTERSECT)


with BuildPart() as f3_10:
    add(f3_9.part)

    # F6_5_t52: cut F6_5_tool54
    add(f6_5_tool54_1.part, mode=Mode.SUBTRACT)


with BuildPart() as f6_5_tool65:
    # F6_5_s66 → F6_5_t67 (new body)
    with BuildSketch(Plane(origin=(-10.0571474138, 0, 21.5676222294), x_dir=(0, 1, 0), z_dir=(0.4226182617, 0, -0.906307787))):
        Polygon((-12.7, 8.0508778862), (-15.24, 5.5108778862), (-15.24, 8.0508778862), align=None)
    extrude(amount=F6_5_T67_DEPTH)

    split(bisect_by=Plane(origin=(2.8107894244, 0, 6.7858459494), x_dir=(0, 1, 0), z_dir=(-0.3826834324, 0, -0.9238795325)), keep=Keep.TOP)


with BuildPart() as f6_5_tool69:
    # F6_5_s70 → F6_5_t71 (new body)
    with BuildSketch(Plane(origin=(-2.4306078074, 0, 1.0067907186), x_dir=(0, 1, 0), z_dir=(0.9238795325, 0, -0.3826834324))):
        Polygon((-12.7, 7.344946728), (-15.24, 4.804946728), (-15.24, 7.344946728), align=None)
    extrude(amount=F6_5_T71_DEPTH)

    split(bisect_by=Plane(origin=(7.2965733207, 0, 3.4024480177), x_dir=(0, 1, 0), z_dir=(-0.906307787, 0, -0.4226182617)), keep=Keep.TOP)


with BuildPart() as f6_5_tool65_1:
    add(f6_5_tool65.part)

    # F6_5_t73: intersect F6_5_tool69
    add(f6_5_tool69.part, mode=Mode.INTERSECT)


with BuildPart() as f3_11:
    add(f3_10.part)

    # F6_5_t63: cut F6_5_tool65
    add(f6_5_tool65_1.part, mode=Mode.SUBTRACT)


with BuildPart() as f6_5_tool76:
    # F6_5_s77 → F6_5_t78 (new body)
    with BuildSketch(Plane(origin=(-22.417331526, 0, -9.2855627503), x_dir=(0, 1, 0), z_dir=(0.9238795325, 0, 0.3826834324))):
        Polygon((-12.7, 7.344946728), (-15.24, 4.804946728), (-15.24, 7.344946728), align=None)
    extrude(amount=F6_5_T78_DEPTH)

    split(bisect_by=Plane(origin=(-7.2965733207, 0, 3.4024480177), x_dir=(0, 1, 0), z_dir=(0.906307787, 0, -0.4226182617)), keep=Keep.TOP)


with BuildPart() as f6_5_tool80:
    # F6_5_s81 → F6_5_t82 (new body)
    with BuildSketch(Plane(origin=(-1.8790325922, 0, -4.0295983977), x_dir=(0, 1, 0), z_dir=(0.4226182617, 0, 0.906307787))):
        Polygon((-15.24, 5.5108778862), (-12.7, 8.0508778862), (-15.24, 8.0508778862), align=None)
    extrude(amount=F6_5_T82_DEPTH)

    split(bisect_by=Plane(origin=(-2.8107894244, 0, 6.7858459494), x_dir=(0, 1, 0), z_dir=(0.3826834324, 0, -0.9238795325)), keep=Keep.TOP)


with BuildPart() as f6_5_tool76_1:
    add(f6_5_tool76.part)

    # F6_5_t84: intersect F6_5_tool80
    add(f6_5_tool80.part, mode=Mode.INTERSECT)


with BuildPart() as f3_12:
    add(f3_11.part)

    # F6_5_t74: cut F6_5_tool76
    add(f6_5_tool76_1.part, mode=Mode.SUBTRACT)


solid = Compound([f1.part, f1b.part, f1c.part, f1d.part, f2.part, f2b.part, f2c.part, f2d.part, f3_12.part])
